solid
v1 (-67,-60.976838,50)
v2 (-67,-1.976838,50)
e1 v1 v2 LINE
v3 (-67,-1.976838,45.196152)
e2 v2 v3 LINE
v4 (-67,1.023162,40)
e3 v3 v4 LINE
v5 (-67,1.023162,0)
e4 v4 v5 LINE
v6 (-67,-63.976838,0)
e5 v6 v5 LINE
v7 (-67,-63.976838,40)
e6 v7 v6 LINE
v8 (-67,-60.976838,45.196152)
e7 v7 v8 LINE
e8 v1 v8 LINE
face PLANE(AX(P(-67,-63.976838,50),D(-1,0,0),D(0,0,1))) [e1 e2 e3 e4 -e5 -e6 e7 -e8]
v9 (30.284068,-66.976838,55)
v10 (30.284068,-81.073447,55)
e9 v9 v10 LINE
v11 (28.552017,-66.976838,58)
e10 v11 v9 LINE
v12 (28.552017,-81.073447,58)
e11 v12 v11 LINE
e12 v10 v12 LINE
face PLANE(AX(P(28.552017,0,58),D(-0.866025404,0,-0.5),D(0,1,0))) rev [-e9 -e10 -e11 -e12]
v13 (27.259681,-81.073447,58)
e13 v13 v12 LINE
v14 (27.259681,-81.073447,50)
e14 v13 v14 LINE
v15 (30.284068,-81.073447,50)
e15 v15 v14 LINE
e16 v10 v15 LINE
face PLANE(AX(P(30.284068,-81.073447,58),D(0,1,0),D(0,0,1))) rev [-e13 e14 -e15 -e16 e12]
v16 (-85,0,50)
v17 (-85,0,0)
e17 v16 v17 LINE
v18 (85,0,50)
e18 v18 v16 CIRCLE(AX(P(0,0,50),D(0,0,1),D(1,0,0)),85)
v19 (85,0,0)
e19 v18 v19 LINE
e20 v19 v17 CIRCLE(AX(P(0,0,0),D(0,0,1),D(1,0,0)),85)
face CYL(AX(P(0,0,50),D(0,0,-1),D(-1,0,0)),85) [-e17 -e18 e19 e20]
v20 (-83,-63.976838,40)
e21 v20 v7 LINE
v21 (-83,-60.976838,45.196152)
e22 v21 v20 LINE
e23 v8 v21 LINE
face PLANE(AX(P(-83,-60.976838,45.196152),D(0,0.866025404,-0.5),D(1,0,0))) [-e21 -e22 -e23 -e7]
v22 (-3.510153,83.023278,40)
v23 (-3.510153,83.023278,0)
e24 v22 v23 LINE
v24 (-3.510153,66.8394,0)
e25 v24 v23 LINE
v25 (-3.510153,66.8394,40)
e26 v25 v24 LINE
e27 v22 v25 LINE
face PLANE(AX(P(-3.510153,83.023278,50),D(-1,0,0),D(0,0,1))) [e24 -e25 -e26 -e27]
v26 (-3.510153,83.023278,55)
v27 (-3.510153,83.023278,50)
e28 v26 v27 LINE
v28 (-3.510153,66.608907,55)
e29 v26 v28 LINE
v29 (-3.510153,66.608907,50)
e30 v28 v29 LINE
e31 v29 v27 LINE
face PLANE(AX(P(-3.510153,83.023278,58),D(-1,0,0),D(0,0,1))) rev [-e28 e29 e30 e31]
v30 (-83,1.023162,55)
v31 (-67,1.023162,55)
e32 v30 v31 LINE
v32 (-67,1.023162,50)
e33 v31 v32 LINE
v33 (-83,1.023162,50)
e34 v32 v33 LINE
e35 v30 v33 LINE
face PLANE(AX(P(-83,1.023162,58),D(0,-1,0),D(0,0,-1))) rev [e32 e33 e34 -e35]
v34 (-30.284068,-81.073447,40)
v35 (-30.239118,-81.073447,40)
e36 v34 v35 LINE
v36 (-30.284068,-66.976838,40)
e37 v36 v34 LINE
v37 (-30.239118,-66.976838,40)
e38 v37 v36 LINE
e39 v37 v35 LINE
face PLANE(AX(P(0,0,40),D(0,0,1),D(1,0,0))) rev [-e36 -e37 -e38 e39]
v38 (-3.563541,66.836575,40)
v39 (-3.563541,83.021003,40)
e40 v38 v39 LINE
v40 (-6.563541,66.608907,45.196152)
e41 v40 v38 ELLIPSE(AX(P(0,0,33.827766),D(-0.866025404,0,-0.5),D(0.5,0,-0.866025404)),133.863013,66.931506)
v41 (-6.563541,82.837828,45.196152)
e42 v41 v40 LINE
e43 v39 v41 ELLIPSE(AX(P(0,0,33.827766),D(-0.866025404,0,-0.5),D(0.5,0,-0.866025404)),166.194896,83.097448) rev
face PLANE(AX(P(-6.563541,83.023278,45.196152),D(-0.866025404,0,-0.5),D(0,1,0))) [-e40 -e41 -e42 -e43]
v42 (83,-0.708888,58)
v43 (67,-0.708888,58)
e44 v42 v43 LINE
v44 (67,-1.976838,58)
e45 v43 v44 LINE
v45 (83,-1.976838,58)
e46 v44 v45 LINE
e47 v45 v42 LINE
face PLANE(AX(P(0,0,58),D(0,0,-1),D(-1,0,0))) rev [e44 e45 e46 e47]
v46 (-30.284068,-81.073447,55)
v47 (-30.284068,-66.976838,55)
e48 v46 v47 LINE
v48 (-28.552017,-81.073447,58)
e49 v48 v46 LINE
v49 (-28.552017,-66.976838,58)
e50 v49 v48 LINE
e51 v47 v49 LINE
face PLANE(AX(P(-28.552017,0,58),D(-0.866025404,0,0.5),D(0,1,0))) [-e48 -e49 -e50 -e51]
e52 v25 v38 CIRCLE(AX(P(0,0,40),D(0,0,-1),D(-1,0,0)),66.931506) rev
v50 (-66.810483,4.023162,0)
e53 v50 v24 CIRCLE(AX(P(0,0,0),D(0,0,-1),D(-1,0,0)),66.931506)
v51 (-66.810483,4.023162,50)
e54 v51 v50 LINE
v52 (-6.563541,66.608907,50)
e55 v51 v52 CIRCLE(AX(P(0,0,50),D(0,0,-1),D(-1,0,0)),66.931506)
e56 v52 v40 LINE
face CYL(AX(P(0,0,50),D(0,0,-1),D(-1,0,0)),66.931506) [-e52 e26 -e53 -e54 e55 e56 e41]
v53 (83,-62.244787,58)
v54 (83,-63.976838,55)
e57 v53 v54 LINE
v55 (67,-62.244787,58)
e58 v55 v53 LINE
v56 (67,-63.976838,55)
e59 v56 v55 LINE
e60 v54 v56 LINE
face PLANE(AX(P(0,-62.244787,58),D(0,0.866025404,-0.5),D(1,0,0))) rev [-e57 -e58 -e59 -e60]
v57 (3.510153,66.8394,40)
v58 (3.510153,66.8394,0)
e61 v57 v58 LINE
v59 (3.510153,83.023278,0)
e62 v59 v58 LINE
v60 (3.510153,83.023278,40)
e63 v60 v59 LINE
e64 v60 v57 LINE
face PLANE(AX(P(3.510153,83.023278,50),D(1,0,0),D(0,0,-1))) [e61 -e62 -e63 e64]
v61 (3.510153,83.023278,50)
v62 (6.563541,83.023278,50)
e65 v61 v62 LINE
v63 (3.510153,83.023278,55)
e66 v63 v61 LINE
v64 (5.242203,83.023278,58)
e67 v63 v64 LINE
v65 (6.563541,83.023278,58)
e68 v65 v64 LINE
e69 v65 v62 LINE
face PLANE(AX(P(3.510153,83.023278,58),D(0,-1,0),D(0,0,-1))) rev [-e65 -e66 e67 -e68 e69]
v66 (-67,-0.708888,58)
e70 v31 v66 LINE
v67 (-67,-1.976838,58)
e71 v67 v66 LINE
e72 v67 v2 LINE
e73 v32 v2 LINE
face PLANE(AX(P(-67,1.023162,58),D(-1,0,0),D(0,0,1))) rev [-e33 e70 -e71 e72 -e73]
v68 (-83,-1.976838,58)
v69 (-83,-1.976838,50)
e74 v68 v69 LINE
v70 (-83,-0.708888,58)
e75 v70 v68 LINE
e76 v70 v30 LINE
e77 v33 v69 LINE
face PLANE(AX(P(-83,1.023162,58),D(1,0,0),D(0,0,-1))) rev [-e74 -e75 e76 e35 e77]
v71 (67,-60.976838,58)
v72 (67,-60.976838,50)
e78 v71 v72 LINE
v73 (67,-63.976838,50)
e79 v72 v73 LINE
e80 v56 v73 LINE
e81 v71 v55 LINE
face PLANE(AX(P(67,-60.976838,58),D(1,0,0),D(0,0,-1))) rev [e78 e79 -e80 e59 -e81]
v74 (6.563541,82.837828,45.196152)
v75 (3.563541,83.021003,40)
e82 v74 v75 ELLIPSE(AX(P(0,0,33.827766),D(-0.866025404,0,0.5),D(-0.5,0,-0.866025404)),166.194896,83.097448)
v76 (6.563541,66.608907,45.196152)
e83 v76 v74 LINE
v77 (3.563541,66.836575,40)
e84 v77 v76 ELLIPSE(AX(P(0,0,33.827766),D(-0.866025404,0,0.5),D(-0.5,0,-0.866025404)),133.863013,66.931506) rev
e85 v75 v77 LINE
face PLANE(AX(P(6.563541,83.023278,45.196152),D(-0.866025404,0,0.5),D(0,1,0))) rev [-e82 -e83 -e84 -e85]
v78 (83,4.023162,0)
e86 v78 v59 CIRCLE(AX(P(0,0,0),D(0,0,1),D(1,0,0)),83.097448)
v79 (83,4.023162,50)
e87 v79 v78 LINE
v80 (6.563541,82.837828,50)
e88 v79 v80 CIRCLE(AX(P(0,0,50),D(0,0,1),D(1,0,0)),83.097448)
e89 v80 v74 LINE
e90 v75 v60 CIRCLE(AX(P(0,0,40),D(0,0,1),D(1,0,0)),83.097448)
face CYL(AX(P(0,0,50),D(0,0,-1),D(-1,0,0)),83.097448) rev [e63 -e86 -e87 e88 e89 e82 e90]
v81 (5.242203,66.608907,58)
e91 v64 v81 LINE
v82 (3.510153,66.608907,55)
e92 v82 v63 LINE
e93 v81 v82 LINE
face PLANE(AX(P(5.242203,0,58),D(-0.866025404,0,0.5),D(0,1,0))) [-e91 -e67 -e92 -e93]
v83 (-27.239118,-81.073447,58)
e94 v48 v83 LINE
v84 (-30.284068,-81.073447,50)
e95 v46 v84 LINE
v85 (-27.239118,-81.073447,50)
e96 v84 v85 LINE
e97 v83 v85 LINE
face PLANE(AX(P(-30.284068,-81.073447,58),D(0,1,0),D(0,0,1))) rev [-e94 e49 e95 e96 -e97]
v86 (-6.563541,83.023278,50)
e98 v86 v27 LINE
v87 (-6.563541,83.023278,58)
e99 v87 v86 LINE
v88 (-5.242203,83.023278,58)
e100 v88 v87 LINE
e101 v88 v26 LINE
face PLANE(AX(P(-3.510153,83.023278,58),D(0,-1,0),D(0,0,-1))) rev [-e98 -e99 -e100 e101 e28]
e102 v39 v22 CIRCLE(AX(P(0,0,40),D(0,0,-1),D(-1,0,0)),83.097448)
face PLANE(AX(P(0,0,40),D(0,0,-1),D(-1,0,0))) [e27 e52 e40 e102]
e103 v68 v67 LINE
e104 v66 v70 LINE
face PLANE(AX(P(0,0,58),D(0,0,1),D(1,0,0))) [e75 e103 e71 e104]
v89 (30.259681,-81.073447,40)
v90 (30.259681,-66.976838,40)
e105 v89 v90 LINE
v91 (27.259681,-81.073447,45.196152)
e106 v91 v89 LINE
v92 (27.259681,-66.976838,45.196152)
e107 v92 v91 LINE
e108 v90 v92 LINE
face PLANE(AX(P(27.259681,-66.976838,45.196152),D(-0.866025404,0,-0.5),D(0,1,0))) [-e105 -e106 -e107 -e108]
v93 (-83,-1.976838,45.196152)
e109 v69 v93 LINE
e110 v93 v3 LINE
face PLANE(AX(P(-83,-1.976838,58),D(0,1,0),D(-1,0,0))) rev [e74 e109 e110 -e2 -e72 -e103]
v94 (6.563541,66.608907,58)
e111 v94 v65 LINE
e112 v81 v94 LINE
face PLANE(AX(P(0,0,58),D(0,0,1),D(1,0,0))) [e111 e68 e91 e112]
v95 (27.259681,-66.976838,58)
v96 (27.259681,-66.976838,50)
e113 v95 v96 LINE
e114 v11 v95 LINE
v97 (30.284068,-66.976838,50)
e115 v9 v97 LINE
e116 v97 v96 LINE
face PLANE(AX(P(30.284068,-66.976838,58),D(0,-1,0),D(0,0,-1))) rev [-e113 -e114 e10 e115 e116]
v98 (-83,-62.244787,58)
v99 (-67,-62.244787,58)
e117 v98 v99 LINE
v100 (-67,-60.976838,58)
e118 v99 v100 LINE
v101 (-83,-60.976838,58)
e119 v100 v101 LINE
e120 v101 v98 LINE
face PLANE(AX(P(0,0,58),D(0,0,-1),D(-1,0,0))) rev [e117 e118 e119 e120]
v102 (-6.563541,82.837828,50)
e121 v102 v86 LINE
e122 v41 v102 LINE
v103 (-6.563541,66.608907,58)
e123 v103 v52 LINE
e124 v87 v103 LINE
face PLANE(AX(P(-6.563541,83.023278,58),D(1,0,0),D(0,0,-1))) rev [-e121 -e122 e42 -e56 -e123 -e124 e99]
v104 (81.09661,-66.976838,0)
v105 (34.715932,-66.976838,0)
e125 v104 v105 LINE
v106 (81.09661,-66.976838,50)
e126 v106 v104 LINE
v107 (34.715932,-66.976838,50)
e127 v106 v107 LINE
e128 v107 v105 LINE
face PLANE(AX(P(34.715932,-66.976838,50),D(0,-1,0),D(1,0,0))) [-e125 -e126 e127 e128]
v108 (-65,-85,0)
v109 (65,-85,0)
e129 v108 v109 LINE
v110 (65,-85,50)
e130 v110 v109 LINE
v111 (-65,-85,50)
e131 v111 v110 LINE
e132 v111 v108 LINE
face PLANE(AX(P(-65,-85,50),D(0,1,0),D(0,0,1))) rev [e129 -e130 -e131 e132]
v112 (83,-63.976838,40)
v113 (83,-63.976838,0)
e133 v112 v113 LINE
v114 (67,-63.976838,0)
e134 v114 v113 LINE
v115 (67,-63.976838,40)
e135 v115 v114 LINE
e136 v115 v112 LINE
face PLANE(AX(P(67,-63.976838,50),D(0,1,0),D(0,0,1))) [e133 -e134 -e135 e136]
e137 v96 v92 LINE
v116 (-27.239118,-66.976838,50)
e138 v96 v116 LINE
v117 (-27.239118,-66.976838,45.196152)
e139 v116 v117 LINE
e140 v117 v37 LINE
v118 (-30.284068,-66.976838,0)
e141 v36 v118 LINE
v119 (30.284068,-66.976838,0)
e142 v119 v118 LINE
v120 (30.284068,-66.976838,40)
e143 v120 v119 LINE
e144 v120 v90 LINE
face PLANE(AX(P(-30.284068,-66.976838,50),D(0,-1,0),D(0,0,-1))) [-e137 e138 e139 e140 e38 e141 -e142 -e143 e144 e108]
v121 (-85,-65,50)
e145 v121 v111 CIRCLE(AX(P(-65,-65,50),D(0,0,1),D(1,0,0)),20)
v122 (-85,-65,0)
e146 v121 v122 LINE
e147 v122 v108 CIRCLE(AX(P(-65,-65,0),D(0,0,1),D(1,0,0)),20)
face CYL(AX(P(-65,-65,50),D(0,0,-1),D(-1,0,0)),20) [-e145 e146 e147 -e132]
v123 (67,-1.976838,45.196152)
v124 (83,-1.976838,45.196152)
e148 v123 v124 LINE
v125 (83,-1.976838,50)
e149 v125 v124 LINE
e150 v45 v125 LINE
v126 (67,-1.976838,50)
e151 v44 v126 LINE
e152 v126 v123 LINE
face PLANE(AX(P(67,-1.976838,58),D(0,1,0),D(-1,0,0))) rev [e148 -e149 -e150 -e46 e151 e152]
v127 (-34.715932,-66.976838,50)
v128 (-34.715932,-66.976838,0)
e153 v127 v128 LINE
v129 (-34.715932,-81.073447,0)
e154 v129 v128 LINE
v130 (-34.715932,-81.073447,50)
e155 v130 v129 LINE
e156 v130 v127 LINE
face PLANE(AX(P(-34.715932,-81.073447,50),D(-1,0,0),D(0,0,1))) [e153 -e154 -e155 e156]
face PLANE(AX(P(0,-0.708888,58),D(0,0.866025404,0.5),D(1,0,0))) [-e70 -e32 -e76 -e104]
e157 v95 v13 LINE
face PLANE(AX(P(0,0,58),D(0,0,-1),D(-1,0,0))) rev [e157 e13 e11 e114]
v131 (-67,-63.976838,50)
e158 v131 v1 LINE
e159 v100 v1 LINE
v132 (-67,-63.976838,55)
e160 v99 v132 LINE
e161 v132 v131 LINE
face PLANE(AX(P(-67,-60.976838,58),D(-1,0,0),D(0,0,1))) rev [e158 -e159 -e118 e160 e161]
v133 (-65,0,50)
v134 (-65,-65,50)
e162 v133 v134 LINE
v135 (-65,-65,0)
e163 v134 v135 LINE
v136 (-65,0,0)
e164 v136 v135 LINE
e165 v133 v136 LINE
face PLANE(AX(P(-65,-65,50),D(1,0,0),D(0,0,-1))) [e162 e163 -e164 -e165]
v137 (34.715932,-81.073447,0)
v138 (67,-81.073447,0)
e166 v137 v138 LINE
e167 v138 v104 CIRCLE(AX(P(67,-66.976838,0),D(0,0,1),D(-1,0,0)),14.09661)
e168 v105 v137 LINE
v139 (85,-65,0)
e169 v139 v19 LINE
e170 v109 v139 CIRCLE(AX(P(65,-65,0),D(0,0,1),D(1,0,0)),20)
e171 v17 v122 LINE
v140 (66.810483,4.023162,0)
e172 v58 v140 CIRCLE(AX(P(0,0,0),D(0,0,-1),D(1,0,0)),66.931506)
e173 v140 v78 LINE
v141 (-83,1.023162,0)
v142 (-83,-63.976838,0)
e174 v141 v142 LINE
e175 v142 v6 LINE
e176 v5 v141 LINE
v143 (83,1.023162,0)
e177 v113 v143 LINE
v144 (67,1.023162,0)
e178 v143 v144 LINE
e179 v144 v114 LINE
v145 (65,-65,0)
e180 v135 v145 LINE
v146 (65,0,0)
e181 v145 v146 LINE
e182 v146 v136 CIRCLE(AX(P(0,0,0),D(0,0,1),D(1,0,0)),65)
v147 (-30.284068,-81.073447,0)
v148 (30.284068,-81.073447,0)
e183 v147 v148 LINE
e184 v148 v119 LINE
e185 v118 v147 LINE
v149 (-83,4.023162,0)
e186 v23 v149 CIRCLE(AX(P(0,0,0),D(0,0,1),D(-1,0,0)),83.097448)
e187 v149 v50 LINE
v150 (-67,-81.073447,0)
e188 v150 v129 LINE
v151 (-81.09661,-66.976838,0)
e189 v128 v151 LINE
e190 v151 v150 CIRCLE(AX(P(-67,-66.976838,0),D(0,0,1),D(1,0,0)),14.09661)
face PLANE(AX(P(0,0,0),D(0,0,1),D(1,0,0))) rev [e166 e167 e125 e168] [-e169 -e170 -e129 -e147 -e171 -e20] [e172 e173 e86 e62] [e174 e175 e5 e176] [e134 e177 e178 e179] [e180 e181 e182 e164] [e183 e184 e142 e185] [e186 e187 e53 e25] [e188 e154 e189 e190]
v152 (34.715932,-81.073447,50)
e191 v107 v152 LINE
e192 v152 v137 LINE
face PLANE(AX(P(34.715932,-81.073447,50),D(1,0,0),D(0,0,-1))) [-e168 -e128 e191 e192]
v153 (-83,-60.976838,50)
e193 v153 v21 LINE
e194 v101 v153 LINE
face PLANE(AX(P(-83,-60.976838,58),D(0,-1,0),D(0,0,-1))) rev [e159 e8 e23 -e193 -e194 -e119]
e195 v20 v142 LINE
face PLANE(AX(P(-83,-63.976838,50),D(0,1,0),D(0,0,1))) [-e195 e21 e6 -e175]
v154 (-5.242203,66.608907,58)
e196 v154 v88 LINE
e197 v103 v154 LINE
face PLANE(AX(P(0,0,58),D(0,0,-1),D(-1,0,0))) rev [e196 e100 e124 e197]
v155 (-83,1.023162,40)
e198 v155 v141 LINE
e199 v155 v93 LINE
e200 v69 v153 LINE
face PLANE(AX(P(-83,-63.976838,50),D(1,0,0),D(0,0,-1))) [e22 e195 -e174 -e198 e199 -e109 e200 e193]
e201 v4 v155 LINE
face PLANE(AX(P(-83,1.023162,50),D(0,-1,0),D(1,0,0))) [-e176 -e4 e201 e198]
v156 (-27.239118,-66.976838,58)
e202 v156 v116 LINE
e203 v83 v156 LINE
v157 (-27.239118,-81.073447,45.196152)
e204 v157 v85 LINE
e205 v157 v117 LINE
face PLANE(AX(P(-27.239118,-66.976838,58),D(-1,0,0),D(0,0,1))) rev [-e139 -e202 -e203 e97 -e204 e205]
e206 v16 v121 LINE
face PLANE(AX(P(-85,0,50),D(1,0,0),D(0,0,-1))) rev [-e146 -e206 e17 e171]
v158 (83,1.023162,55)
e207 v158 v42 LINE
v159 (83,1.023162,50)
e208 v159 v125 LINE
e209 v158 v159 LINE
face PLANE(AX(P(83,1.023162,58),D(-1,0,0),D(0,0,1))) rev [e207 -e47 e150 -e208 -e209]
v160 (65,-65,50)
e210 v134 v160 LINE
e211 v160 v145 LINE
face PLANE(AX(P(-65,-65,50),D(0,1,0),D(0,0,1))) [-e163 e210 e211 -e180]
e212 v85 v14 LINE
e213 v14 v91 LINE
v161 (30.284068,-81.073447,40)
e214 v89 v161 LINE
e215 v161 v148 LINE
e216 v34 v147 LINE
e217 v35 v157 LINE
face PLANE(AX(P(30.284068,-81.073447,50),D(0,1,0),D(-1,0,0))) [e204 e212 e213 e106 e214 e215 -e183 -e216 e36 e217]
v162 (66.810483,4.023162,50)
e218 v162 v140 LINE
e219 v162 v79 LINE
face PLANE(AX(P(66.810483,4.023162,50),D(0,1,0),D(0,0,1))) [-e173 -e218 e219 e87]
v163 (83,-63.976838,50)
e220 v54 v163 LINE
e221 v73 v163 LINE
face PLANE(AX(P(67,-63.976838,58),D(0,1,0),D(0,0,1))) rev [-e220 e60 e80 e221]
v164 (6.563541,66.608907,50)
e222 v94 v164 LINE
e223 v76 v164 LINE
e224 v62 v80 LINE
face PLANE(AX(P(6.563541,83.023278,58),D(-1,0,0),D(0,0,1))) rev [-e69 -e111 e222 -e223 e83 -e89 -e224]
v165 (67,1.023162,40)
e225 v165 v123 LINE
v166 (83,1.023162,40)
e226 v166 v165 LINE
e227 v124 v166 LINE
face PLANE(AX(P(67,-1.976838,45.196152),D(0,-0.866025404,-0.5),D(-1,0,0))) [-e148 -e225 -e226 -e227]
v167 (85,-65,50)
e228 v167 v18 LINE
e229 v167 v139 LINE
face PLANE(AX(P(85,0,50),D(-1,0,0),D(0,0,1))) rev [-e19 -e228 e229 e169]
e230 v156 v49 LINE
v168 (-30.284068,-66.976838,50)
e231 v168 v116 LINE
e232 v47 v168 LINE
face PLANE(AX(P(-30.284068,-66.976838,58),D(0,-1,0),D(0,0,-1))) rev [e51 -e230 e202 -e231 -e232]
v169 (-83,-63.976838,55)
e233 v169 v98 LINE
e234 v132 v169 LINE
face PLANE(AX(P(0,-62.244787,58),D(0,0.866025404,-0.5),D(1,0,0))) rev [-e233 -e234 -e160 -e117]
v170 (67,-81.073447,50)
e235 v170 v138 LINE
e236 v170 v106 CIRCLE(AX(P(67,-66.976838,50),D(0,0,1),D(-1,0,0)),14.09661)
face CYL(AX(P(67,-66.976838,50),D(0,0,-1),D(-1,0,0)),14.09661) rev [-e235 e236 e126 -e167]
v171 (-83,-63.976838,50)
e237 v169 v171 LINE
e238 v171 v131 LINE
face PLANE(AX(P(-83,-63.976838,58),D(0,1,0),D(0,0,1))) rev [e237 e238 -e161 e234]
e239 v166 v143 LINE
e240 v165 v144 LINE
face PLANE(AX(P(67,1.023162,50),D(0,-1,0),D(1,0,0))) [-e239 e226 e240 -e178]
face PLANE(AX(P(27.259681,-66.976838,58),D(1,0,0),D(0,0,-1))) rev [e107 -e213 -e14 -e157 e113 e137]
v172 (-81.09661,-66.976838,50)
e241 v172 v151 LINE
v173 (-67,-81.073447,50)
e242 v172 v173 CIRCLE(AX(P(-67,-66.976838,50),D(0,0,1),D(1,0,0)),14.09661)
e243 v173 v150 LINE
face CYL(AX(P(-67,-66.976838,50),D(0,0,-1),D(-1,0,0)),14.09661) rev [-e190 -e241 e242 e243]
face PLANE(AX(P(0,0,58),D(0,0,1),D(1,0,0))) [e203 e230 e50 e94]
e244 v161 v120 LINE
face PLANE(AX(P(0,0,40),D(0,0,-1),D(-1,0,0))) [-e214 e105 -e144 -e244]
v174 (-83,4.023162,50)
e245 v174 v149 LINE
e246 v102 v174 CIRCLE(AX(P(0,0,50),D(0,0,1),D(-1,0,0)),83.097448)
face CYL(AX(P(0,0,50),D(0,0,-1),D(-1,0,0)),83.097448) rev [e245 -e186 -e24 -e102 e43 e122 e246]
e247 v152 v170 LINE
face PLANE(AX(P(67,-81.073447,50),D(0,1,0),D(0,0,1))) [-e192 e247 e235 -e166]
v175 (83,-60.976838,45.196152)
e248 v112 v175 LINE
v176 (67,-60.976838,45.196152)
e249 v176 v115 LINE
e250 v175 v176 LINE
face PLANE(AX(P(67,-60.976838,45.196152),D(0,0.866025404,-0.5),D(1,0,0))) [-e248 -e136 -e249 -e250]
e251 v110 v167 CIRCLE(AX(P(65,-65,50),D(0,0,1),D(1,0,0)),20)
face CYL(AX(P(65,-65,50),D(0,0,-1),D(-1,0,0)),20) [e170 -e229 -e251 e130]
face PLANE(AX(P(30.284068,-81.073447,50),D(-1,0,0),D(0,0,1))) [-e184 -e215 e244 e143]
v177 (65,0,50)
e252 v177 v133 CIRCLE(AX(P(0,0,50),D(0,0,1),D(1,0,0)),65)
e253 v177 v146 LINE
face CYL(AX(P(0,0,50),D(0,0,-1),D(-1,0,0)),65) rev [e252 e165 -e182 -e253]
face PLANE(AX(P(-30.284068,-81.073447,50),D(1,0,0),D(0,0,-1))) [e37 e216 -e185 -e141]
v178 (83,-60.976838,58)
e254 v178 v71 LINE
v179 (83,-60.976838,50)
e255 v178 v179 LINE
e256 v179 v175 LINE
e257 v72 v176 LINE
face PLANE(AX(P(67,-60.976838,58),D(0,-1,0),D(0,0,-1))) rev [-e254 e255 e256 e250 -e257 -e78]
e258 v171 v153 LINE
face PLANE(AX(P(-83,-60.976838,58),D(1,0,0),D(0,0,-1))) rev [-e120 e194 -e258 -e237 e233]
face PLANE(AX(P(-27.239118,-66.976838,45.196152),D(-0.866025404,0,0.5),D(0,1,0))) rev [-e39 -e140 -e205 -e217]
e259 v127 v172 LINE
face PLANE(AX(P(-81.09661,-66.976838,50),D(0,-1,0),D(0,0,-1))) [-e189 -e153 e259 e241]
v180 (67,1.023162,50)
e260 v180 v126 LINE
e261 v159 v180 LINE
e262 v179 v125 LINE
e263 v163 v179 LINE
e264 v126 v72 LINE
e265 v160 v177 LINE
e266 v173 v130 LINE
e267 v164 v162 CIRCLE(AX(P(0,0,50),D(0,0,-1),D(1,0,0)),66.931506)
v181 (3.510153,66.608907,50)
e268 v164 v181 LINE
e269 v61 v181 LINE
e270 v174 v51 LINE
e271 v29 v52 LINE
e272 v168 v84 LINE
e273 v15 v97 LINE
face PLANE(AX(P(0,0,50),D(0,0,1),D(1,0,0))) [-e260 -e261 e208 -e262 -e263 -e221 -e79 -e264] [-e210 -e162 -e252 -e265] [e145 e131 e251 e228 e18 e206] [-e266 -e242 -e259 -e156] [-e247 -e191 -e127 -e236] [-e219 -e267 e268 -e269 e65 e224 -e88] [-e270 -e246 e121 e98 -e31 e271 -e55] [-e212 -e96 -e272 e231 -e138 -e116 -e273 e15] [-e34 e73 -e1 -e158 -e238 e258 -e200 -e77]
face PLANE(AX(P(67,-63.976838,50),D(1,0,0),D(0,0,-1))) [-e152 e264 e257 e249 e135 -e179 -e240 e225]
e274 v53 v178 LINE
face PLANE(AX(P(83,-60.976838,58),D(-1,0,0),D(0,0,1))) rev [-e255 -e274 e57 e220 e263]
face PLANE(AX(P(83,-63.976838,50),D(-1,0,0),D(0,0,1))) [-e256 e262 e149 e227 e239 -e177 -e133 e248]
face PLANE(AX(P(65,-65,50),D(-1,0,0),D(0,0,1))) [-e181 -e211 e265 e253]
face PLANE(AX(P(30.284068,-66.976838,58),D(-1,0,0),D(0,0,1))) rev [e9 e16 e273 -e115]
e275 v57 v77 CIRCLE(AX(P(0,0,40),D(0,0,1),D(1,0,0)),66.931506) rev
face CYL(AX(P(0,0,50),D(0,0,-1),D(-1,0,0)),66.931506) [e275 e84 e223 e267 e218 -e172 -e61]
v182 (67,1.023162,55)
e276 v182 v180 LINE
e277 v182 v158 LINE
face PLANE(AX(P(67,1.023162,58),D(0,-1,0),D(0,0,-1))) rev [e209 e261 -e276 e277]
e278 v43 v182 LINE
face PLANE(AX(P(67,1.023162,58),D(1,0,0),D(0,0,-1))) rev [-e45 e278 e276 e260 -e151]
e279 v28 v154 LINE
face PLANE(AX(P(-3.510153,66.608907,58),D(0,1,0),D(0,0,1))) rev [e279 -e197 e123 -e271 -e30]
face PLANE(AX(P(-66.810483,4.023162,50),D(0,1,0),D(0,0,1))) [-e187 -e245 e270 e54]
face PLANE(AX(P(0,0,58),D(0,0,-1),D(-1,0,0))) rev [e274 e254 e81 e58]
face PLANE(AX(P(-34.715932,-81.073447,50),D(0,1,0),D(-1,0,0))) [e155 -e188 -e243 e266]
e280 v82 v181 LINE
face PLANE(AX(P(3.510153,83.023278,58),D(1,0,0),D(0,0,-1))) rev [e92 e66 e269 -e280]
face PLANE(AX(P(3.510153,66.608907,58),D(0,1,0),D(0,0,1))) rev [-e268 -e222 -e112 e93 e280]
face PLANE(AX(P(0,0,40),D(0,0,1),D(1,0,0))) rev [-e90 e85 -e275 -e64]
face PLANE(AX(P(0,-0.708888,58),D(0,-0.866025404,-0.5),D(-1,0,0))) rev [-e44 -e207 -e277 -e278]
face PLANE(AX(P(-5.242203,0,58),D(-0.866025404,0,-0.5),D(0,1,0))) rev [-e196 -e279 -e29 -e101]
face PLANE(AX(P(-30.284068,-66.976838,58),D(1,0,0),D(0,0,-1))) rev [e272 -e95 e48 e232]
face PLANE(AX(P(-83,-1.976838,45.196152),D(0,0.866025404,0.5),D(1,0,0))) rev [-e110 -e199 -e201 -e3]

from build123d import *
from OCP.BRepFilletAPI import BRepFilletAPI_MakeChamfer

# Parameters (mm, degrees)
CROQUIS1_W              = 16
CROQUIS1_H              = 65
CROQUIS1_W_2            = 60.56813556
CROQUIS1_H_2            = 14.096609531
SALIENTE_EXTRUIR1_DEPTH = 50
CROQUIS3_W              = 16
CROQUIS3_H              = 3
CROQUIS3_W_2            = 3.053388568
CROQUIS3_H_2            = 16.41437111
CROQUIS3_W_3            = 3.044949639
CROQUIS3_H_3            = 14.096609531
CROQUIS3_W_4            = 3.024386733
SALIENTE_EXTRUIR2_DEPTH = 18
CHAFL_N2_SIZE           = 3
CHAFL_N2_SIZE2          = 1.732050808
CHAFL_N3_SIZE           = 5.196152423
CHAFL_N3_SIZE_2         = 3


with BuildPart() as part:
    # Croquis1 → Saliente-Extruir1 (new body)
    with BuildSketch(Plane.XY):
        with BuildLine():
            Line((-85, 0), (-85, -65))
            ThreePointArc((-85, -65), (-79.142135624, -79.142135624), (-65, -85))
            Line((-65, -85), (65, -85))
            ThreePointArc((65, -85), (79.142135624, -79.142135624), (85, -65))
            Line((85, -65), (85, 0))
            ThreePointArc((85, 0), (0, 85), (-85, 0))
        make_face()
        with Locations((75, -31.476837664)):
            Rectangle(CROQUIS1_W, CROQUIS1_H, mode=Mode.SUBTRACT)
        with BuildLine():
            Line((-65, -65), (65, -65))
            Line((65, -65), (65, 0))
            ThreePointArc((65, 0), (0, 65), (-65, 0))
            Line((-65, 0), (-65, -65))
        make_face(mode=Mode.SUBTRACT)
        with Locations((-75, -31.476837664)):
            Rectangle(CROQUIS1_W, CROQUIS1_H, mode=Mode.SUBTRACT)
        with BuildLine():
            Line((3.510152615, 83.023277843), (3.510152615, 66.83939974))
            ThreePointArc((3.510152615, 66.83939974), (47.145709065, 47.509037517), (66.810483413, 4.023162336))
            Line((66.810483413, 4.023162336), (83, 4.023162336))
            ThreePointArc((83, 4.023162336), (58.576925397, 58.940051292), (3.510152615, 83.023277843))
        make_face(mode=Mode.SUBTRACT)
        with BuildLine():
            Line((-66.810483413, 4.023162336), (-83, 4.023162336))
            ThreePointArc((-83, 4.023162336), (-58.576925397, 58.940051292), (-3.510152615, 83.023277843))
            Line((-3.510152615, 83.023277843), (-3.510152615, 66.83939974))
            ThreePointArc((-3.510152615, 66.83939974), (-47.145709065, 47.509037517), (-66.810483413, 4.023162336))
        make_face(mode=Mode.SUBTRACT)
        with BuildLine():
            Line((-81.096609531, -66.976837664), (-34.71593222, -66.976837664))
            Line((-34.71593222, -66.976837664), (-34.71593222, -81.073447195))
            Line((-34.71593222, -81.073447195), (-67, -81.073447195))
            ThreePointArc((-67, -81.073447195), (-76.967808191, -76.944645855), (-81.096609531, -66.976837664))
        make_face(mode=Mode.SUBTRACT)
        with BuildLine():
            Line((67, -81.073447195), (34.71593222, -81.073447195))
            Line((34.71593222, -81.073447195), (34.71593222, -66.976837664))
            Line((34.71593222, -66.976837664), (81.096609531, -66.976837664))
            ThreePointArc((81.096609531, -66.976837664), (76.967808191, -76.944645855), (67, -81.073447195))
        make_face(mode=Mode.SUBTRACT)
        with Locations((0, -74.025142429)):
            Rectangle(CROQUIS1_W_2, CROQUIS1_H_2, mode=Mode.SUBTRACT)
    extrude(amount=SALIENTE_EXTRUIR1_DEPTH)

    # Croquis3 → Saliente-Extruir2 (add)
    with BuildSketch(Plane.XY.offset(40)):
        with Locations((-75, -0.476837664)):
            Rectangle(CROQUIS3_W, CROQUIS3_H)
        with Locations((-75, -62.476837664)):
            Rectangle(CROQUIS3_W, CROQUIS3_H)
        with Locations((75, -62.476837664)):
            Rectangle(CROQUIS3_W, CROQUIS3_H)
        with Locations((75, -0.476837664)):
            Rectangle(CROQUIS3_W, CROQUIS3_H)
        with Locations((-5.036846899, 74.816092288)):
            Rectangle(CROQUIS3_W_2, CROQUIS3_H_2)
        with Locations((5.036846899, 74.816092288)):
            Rectangle(CROQUIS3_W_2, CROQUIS3_H_2)
        with Locations((-28.761592961, -74.025142429)):
            Rectangle(CROQUIS3_W_3, CROQUIS3_H_3)
        with Locations((28.771874414, -74.025142429)):
            Rectangle(CROQUIS3_W_4, CROQUIS3_H_3)
    extrude(amount=SALIENTE_EXTRUIR2_DEPTH)

    # Chaflán2: one chamfer whose edges measure the first distance from different faces: ONE call of the kernel's chamfer builder (chamfer() names one face for all edges)
    chafl_n2_edges_1 = [part.edges().sort_by_distance(p)[0] for p in [
        (-75, 1.023162336, 58),
    ]]
    chafl_n2_side_1 = [part.faces().sort_by_distance(p)[0] for p in [
        (-75, 1.023162336, 54),
    ]]
    chafl_n2_edges_2 = [part.edges().sort_by_distance(p)[0] for p in [
        (-75, -63.976837664, 58),
    ]]
    chafl_n2_side_2 = [part.faces().sort_by_distance(p)[0] for p in [
        (-75, -63.976837664, 54),
    ]]
    chafl_n2_edges_3 = [part.edges().sort_by_distance(p)[0] for p in [
        (75, -63.976837664, 58),
    ]]
    chafl_n2_side_3 = [part.faces().sort_by_distance(p)[0] for p in [
        (75, -63.976837664, 54),
    ]]
    chafl_n2_edges_4 = [part.edges().sort_by_distance(p)[0] for p in [
        (75, 1.023162336, 58),
    ]]
    chafl_n2_side_4 = [part.faces().sort_by_distance(p)[0] for p in [
        (75, 1.023162336, 54),
    ]]
    chafl_n2_edges_5 = [part.edges().sort_by_distance(p)[0] for p in [
        (-3.510152615, 74.816092288, 58),
    ]]
    chafl_n2_side_5 = [part.faces().sort_by_distance(p)[0] for p in [
        (-3.510152615, 74.816092288, 54),
    ]]
    chafl_n2_edges_6 = [part.edges().sort_by_distance(p)[0] for p in [
        (3.510152615, 74.816092288, 58),
    ]]
    chafl_n2_side_6 = [part.faces().sort_by_distance(p)[0] for p in [
        (3.510152615, 74.816092288, 54),
    ]]
    chafl_n2_edges_7 = [part.edges().sort_by_distance(p)[0] for p in [
        (-30.28406778, -74.025142429, 58),
    ]]
    chafl_n2_side_7 = [part.faces().sort_by_distance(p)[0] for p in [
        (-30.28406778, -74.025142429, 54),
    ]]
    chafl_n2_edges_8 = [part.edges().sort_by_distance(p)[0] for p in [
        (30.28406778, -74.025142429, 58),
    ]]
    chafl_n2_side_8 = [part.faces().sort_by_distance(p)[0] for p in [
        (30.28406778, -74.025142429, 54),
    ]]
    chafl_n2 = BRepFilletAPI_MakeChamfer(part.part.solid().wrapped)
    for e in chafl_n2_edges_1:
        chafl_n2.Add(CHAFL_N2_SIZE, CHAFL_N2_SIZE2, e.wrapped, chafl_n2_side_1[0].wrapped)  # the first distance lies on this face
    for e in chafl_n2_edges_2:
        chafl_n2.Add(CHAFL_N2_SIZE, CHAFL_N2_SIZE2, e.wrapped, chafl_n2_side_2[0].wrapped)  # the first distance lies on this face
    for e in chafl_n2_edges_3:
        chafl_n2.Add(CHAFL_N2_SIZE, CHAFL_N2_SIZE2, e.wrapped, chafl_n2_side_3[0].wrapped)  # the first distance lies on this face
    for e in chafl_n2_edges_4:
        chafl_n2.Add(CHAFL_N2_SIZE, CHAFL_N2_SIZE2, e.wrapped, chafl_n2_side_4[0].wrapped)  # the first distance lies on this face
    for e in chafl_n2_edges_5:
        chafl_n2.Add(CHAFL_N2_SIZE, CHAFL_N2_SIZE2, e.wrapped, chafl_n2_side_5[0].wrapped)  # the first distance lies on this face
    for e in chafl_n2_edges_6:
        chafl_n2.Add(CHAFL_N2_SIZE, CHAFL_N2_SIZE2, e.wrapped, chafl_n2_side_6[0].wrapped)  # the first distance lies on this face
    for e in chafl_n2_edges_7:
        chafl_n2.Add(CHAFL_N2_SIZE, CHAFL_N2_SIZE2, e.wrapped, chafl_n2_side_7[0].wrapped)  # the first distance lies on this face
    for e in chafl_n2_edges_8:
        chafl_n2.Add(CHAFL_N2_SIZE, CHAFL_N2_SIZE2, e.wrapped, chafl_n2_side_8[0].wrapped)  # the first distance lies on this face
    add(Compound.cast(chafl_n2.Shape()), mode=Mode.REPLACE)

    # Chaflán3
    chafl_n3_edges_1 = [part.edges().sort_by_distance(p)[0] for p in [
        (75, -60.976837664, 40),
    ]]
    chafl_n3_side_1 = [part.faces().sort_by_distance(p)[0] for p in [
        (75, -60.976837664, 40.06),
    ]]
    chafl_n3_edges_2 = [part.edges().sort_by_distance(p)[0] for p in [
        (75, -1.976837664, 40),
    ]]
    chafl_n3_side_2 = [part.faces().sort_by_distance(p)[0] for p in [
        (75, -1.976837664, 40.06),
    ]]
    chafl_n3_edges_3 = [part.edges().sort_by_distance(p)[0] for p in [
        (27.259681047, -74.025142429, 40),
    ]]
    chafl_n3_side_3 = [part.faces().sort_by_distance(p)[0] for p in [
        (27.319681047, -74.025142429, 40),
    ]]
    chafl_n3_edges_4 = [part.edges().sort_by_distance(p)[0] for p in [
        (-27.239118141, -74.025142429, 40),
    ]]
    chafl_n3_side_4 = [part.faces().sort_by_distance(p)[0] for p in [
        (-27.239118141, -74.025142429, 40.06),
    ]]
    chafl_n3_edges_5 = [part.edges().sort_by_distance(p)[0] for p in [
        (-75, -60.976837664, 40),
    ]]
    chafl_n3_side_5 = [part.faces().sort_by_distance(p)[0] for p in [
        (-75, -60.976837664, 40.06),
    ]]
    chafl_n3_edges_6 = [part.edges().sort_by_distance(p)[0] for p in [
        (-75, -1.976837664, 40),
    ]]
    chafl_n3_side_6 = [part.faces().sort_by_distance(p)[0] for p in [
        (-75, -1.976837664, 40.06),
    ]]
    chafl_n3_edges_7 = [part.edges().sort_by_distance(p)[0] for p in [
        (-6.563541183, 74.72336741, 40),
    ]]
    chafl_n3_side_7 = [part.faces().sort_by_distance(p)[0] for p in [
        (-6.563541183, 74.72336741, 40.06),
    ]]
    chafl_n3_edges_8 = [part.edges().sort_by_distance(p)[0] for p in [
        (6.563541183, 74.72336741, 40),
    ]]
    chafl_n3_side_8 = [part.faces().sort_by_distance(p)[0] for p in [
        (6.563541183, 74.72336741, 40.06),
    ]]
    chafl_n3 = BRepFilletAPI_MakeChamfer(part.part.solid().wrapped)
    for e in chafl_n3_edges_1:
        chafl_n3.Add(CHAFL_N3_SIZE - 0.0001, CHAFL_N3_SIZE_2 - 0.0001, e.wrapped, chafl_n3_side_1[0].wrapped)
    for e in chafl_n3_edges_2:
        chafl_n3.Add(CHAFL_N3_SIZE - 0.0001, CHAFL_N3_SIZE_2 - 0.0001, e.wrapped, chafl_n3_side_2[0].wrapped)
    for e in chafl_n3_edges_3:
        chafl_n3.Add(CHAFL_N3_SIZE_2 - 0.0001, CHAFL_N3_SIZE - 0.0001, e.wrapped, chafl_n3_side_3[0].wrapped)
    for e in chafl_n3_edges_4:
        chafl_n3.Add(CHAFL_N3_SIZE - 0.0001, CHAFL_N3_SIZE_2 - 0.0001, e.wrapped, chafl_n3_side_4[0].wrapped)
    for e in chafl_n3_edges_5:
        chafl_n3.Add(CHAFL_N3_SIZE - 0.0001, CHAFL_N3_SIZE_2 - 0.0001, e.wrapped, chafl_n3_side_5[0].wrapped)
    for e in chafl_n3_edges_6:
        chafl_n3.Add(CHAFL_N3_SIZE - 0.0001, CHAFL_N3_SIZE_2 - 0.0001, e.wrapped, chafl_n3_side_6[0].wrapped)
    for e in chafl_n3_edges_7:
        chafl_n3.Add(CHAFL_N3_SIZE - 0.0001, CHAFL_N3_SIZE_2 - 0.0001, e.wrapped, chafl_n3_side_7[0].wrapped)
    for e in chafl_n3_edges_8:
        chafl_n3.Add(CHAFL_N3_SIZE - 0.0001, CHAFL_N3_SIZE_2 - 0.0001, e.wrapped, chafl_n3_side_8[0].wrapped)
    add(Compound.cast(chafl_n3.Shape()), mode=Mode.REPLACE)  # a hair under: the kernel refuses the full size


solid = part.part
